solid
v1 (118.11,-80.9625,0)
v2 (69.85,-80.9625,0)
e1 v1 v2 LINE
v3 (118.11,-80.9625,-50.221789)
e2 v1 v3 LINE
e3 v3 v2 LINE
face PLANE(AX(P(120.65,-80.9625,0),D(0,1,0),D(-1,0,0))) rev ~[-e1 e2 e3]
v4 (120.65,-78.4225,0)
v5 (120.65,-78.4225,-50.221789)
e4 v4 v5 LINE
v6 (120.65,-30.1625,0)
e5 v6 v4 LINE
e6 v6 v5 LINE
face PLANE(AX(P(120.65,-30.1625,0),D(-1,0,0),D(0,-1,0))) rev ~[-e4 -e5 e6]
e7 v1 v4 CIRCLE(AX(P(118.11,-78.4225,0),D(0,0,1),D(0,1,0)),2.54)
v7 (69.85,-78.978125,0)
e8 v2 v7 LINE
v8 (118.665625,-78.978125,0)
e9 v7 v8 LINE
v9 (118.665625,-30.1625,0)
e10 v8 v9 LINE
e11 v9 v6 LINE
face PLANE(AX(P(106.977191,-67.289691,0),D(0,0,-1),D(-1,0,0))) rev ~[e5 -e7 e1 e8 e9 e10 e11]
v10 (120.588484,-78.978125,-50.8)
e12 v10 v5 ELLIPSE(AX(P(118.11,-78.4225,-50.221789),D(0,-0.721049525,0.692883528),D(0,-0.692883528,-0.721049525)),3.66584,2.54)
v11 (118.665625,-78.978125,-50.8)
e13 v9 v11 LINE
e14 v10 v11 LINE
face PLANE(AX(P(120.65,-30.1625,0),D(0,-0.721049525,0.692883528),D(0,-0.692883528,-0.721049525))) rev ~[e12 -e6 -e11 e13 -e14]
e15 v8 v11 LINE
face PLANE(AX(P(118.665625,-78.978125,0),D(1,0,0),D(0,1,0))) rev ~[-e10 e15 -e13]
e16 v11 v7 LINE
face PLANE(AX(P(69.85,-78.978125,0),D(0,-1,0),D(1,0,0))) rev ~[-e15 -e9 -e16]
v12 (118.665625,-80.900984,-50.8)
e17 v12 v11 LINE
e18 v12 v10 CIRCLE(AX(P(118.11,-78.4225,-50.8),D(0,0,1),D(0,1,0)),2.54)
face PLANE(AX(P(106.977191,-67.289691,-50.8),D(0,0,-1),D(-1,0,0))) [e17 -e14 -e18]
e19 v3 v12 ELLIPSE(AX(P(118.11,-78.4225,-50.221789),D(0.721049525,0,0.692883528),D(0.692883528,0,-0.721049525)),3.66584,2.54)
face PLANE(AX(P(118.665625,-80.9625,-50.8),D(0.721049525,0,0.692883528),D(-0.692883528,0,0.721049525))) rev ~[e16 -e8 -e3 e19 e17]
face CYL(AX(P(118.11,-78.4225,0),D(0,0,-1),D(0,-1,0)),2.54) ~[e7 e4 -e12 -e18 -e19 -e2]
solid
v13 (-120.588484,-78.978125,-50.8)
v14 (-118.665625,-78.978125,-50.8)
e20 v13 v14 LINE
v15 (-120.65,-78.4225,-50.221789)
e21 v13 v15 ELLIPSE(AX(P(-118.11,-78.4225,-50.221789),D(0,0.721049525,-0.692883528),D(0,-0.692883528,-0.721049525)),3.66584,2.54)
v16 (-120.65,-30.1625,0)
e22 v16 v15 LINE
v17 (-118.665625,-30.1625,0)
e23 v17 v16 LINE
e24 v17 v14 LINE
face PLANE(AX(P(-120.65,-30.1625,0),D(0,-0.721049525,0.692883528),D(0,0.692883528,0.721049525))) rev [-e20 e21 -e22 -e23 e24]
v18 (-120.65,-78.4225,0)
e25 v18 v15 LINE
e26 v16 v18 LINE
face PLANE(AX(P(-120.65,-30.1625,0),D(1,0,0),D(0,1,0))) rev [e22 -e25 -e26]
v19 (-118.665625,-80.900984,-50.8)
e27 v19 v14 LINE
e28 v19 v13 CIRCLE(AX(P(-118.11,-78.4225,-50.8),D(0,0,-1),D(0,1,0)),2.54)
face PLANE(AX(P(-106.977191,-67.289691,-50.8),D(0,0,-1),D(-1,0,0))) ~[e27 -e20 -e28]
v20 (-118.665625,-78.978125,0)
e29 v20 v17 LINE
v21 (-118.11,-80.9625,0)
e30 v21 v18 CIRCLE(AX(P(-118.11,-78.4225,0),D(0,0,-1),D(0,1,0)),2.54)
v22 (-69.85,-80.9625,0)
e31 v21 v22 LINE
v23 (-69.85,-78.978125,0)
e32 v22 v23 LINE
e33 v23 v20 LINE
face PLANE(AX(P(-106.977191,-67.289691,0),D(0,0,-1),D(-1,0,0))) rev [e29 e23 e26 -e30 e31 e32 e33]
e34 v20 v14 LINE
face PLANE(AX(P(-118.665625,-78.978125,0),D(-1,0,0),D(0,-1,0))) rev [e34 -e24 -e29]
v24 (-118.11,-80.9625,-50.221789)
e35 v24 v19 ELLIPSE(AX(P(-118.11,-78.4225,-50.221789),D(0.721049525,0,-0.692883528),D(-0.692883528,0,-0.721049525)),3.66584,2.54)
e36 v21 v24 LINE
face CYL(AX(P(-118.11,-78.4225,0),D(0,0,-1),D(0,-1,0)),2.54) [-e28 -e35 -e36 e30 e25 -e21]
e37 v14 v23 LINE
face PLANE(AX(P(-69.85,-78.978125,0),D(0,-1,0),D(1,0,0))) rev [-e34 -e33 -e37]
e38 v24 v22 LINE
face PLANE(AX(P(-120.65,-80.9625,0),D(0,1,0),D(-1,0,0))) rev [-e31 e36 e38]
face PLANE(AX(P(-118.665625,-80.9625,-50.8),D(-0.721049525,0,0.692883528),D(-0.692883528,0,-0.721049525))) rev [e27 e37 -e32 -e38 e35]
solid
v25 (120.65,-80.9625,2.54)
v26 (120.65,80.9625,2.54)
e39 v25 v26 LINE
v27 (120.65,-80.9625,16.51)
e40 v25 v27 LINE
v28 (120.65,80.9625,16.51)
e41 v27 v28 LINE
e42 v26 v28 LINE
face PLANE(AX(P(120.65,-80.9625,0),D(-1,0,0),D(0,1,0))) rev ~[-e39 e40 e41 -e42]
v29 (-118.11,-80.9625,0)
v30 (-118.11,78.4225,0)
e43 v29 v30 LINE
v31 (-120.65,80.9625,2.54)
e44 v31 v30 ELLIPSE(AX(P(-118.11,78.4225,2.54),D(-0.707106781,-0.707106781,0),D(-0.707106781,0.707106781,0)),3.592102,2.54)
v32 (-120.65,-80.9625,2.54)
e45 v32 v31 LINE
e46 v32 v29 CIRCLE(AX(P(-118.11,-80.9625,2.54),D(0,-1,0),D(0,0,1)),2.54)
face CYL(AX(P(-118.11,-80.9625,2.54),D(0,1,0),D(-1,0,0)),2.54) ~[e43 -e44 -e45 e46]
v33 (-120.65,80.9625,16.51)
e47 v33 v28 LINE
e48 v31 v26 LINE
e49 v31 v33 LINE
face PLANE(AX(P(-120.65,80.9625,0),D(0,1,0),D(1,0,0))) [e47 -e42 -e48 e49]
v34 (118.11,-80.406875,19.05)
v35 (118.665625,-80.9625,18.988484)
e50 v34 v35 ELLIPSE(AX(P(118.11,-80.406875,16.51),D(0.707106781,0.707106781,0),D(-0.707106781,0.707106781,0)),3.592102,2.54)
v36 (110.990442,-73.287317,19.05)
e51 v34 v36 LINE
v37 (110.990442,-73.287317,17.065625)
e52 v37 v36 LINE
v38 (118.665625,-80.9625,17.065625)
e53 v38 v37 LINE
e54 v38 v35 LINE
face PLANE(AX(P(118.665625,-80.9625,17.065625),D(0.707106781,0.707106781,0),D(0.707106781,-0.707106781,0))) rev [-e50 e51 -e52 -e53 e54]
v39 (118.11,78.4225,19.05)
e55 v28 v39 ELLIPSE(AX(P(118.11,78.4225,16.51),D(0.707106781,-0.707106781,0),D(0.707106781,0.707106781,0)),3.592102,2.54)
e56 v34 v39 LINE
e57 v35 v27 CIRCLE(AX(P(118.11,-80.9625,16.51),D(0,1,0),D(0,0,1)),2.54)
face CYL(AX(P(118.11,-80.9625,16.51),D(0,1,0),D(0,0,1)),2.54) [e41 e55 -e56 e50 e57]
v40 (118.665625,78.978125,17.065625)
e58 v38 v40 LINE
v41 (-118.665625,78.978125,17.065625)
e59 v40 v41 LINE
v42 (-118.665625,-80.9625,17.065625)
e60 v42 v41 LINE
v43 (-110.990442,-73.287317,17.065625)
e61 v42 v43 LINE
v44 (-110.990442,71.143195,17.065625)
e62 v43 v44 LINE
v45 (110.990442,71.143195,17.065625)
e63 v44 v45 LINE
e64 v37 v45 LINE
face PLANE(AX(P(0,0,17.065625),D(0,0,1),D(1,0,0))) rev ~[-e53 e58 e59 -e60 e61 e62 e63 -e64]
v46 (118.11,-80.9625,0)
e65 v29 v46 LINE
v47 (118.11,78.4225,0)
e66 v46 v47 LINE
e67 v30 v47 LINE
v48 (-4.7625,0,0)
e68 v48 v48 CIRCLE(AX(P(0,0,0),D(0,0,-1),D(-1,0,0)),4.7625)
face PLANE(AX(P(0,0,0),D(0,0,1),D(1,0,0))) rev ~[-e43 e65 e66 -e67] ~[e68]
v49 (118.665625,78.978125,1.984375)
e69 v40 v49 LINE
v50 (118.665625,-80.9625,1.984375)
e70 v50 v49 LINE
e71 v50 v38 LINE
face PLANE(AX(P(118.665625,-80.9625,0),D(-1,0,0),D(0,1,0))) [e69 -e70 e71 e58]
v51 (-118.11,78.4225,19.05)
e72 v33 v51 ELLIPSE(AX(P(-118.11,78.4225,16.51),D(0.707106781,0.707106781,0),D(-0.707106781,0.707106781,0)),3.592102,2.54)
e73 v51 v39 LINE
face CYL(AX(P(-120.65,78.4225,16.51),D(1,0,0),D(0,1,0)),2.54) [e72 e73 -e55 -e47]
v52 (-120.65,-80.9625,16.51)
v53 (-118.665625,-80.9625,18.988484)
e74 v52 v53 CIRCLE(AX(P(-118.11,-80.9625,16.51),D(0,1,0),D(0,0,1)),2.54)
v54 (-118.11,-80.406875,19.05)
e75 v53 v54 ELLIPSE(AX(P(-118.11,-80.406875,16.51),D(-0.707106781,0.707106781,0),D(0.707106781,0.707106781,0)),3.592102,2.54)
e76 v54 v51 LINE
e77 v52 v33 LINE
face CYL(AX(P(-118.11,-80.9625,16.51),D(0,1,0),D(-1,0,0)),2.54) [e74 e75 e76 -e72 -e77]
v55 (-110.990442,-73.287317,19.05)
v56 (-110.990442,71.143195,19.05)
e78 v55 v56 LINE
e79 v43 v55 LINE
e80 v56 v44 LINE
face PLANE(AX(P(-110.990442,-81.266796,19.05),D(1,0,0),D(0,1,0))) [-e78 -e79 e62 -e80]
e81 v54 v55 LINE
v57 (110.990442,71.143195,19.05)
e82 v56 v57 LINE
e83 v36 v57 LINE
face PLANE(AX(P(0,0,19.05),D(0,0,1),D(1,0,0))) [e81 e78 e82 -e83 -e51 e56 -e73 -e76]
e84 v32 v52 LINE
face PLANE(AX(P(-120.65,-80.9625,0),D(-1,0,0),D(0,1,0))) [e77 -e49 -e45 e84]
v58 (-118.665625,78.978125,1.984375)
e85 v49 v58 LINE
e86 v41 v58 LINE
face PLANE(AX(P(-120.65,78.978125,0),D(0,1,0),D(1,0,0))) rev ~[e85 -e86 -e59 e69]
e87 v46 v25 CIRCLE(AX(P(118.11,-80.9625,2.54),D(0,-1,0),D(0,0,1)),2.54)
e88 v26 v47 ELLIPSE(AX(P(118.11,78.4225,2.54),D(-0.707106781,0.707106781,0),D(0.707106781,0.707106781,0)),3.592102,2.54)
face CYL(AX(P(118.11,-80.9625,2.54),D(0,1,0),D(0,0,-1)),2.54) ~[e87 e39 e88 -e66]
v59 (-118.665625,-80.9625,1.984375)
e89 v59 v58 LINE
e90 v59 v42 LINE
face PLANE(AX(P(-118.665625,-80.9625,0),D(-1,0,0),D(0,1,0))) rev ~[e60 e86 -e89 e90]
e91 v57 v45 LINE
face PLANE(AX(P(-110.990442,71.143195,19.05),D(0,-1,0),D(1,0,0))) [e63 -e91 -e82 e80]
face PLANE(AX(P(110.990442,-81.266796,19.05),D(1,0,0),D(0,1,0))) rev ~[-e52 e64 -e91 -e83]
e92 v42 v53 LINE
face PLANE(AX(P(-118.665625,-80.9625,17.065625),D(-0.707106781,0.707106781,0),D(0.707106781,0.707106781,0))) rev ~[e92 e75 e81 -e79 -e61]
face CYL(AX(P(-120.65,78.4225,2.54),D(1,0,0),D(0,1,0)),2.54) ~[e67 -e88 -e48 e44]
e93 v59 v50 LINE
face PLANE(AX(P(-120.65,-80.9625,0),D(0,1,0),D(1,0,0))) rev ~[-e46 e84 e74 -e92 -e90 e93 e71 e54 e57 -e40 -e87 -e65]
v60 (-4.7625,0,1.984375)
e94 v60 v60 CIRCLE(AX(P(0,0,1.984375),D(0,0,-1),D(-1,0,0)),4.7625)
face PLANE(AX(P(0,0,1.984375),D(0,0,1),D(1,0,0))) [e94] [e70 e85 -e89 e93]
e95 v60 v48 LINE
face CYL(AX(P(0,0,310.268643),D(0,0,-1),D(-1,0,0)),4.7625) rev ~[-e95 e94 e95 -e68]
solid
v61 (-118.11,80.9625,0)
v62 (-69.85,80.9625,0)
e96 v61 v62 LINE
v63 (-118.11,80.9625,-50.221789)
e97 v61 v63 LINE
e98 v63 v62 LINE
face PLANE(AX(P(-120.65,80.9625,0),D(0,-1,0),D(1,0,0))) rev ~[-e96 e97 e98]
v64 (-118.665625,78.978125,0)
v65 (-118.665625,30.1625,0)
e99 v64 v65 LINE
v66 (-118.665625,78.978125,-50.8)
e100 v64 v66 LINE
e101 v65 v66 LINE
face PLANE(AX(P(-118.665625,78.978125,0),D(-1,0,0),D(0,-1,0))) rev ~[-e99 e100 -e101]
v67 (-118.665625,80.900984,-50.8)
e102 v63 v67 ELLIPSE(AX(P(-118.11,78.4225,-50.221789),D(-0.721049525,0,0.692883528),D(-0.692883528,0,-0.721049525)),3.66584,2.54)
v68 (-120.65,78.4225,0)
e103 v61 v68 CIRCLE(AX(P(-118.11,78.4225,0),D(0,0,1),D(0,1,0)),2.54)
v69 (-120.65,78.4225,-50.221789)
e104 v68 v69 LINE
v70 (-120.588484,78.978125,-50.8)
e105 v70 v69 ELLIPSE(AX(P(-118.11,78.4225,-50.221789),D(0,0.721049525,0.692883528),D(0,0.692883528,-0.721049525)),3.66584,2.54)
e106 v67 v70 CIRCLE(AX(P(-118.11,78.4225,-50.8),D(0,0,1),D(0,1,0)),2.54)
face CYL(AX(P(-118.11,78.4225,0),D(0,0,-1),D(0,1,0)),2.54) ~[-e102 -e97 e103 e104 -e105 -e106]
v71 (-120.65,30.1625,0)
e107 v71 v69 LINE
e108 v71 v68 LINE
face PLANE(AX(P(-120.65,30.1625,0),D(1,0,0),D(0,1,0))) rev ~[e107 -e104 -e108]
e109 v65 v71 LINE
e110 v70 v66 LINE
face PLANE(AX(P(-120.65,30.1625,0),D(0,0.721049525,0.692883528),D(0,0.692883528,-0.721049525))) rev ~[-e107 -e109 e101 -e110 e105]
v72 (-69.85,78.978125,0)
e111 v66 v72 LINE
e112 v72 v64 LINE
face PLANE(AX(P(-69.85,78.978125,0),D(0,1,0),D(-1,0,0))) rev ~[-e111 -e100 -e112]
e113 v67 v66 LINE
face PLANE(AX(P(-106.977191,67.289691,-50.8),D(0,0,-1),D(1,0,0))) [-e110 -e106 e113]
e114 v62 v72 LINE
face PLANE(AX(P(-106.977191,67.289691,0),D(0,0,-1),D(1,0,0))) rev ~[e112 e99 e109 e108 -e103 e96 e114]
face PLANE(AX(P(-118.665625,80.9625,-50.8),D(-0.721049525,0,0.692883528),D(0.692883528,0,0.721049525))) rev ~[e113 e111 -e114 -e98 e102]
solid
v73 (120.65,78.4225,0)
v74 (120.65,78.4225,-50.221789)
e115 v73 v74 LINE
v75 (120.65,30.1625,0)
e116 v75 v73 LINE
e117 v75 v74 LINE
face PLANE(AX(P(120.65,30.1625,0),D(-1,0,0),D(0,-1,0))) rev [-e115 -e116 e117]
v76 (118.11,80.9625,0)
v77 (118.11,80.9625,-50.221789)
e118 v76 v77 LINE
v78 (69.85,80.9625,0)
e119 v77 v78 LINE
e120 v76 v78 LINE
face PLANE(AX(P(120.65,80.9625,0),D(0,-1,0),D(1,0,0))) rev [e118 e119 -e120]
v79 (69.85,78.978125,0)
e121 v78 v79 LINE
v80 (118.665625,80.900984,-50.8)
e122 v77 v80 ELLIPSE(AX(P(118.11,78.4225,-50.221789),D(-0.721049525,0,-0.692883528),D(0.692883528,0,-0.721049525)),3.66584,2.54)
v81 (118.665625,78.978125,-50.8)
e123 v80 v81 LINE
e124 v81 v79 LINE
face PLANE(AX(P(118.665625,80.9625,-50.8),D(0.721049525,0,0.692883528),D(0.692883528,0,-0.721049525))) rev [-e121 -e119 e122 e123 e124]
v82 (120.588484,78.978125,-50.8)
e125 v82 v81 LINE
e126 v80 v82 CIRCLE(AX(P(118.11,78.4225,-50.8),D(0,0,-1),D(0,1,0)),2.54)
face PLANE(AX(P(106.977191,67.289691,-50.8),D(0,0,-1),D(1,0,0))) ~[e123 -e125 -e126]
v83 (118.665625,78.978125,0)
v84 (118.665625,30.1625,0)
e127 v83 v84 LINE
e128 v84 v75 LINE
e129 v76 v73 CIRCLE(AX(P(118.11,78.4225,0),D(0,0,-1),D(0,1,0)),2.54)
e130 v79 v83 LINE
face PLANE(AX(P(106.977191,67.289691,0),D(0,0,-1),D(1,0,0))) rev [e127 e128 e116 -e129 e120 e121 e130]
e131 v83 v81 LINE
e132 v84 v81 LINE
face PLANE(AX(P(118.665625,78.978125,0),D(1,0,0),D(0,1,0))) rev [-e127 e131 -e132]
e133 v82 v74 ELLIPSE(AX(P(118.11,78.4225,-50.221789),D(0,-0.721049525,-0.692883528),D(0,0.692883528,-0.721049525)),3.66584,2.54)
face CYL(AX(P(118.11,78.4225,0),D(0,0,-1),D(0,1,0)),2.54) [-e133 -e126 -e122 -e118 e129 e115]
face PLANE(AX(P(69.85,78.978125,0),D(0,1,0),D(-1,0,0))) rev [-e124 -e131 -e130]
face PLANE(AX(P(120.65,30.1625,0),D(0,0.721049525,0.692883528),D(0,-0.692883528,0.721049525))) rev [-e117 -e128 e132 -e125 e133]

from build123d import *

# Parameters (mm, degrees)
F0_W      = 241.3
F0_H      = 161.925
F1_DEPTH  = 19.05
F3_T      = -1.984375
F4_W      = 221.9808846712
F4_H      = 152.4099913843
F5_DEPTH  = 5.17584
F7_DEPTH  = 50.8
F9_DEPTH  = 1.984375
F11_DEPTH = 1.984375
F14_R     = 2.54
F15_R     = 2.54
F15_2_R   = 2.54
F15_3_R   = 2.54
F15_4_R   = 2.54
F17_DEPTH = 1.984375
F19_D     = 9.525


# Not quite as in the source:
# - a length typed as a fraction of an inch, garbled in the dataset ("3 / 203.2 mm" for 3/8 in), is restored
# - a pattern or mirror of a feature is missing from the dataset's text; its kind, count and spacing are read off the source's solid


with BuildPart() as f1:
    # F0 (on Top) → F1 (new body)
    with BuildSketch(Plane.XY):
        Rectangle(F0_W, F0_H)
    extrude(amount=F1_DEPTH)

    # F3
    f3_openings = [f1.faces().sort_by_distance(p)[0] for p in [
        (0, -80.9625, 9.525),
    ]]
    offset(amount=F3_T, openings=f3_openings)

    # F4 (on face) → F5 (cut)
    with BuildSketch(Plane.XY.offset(19.05)):
        with Locations((0, -5.0618006591)):
            Rectangle(F4_W, F4_H)
    extrude(amount=-F5_DEPTH, mode=Mode.SUBTRACT)

    # F14
    f14_edges = [f1.edges().sort_by_distance(p)[0] for p in [
        (-120.65, 0, 19.05),
        (0, 80.9625, 19.05),
        (120.65, 0, 19.05),
        (-120.65, 0, 0),
        (0, 80.9625, 0),
        (120.65, 0, 0),
    ]]
    fillet(f14_edges, radius=F14_R)

    # F16 (on face) → F17 (cut, through all)
    with BuildSketch(Plane(origin=(0, 0, 17.065625), x_dir=(1, 0, 0), z_dir=(0, 0, -1))):
        Polygon((-110.9904423356, 73.2873173356), (-110.9904423356, 80.9625), (-118.665625, 80.9625), align=None)
    f17 = extrude(amount=-F17_DEPTH, mode=Mode.SUBTRACT)

    # F17_copies: F17 across plane
    add(f17.mirror(Plane(origin=(0, 0, 0), x_dir=(0, 0, 1), z_dir=(1, 0, 0))), mode=Mode.SUBTRACT)

    # F19 (through all)
    with Locations(Plane.XY.offset(19.05)):
        with Locations((0, 0)):
            Hole(F19_D / 2)


with BuildPart() as f7:
    # F6 (on face) → F7 (new body)
    with BuildSketch(Plane(origin=(0, 0, 0), x_dir=(1, 0, 0), z_dir=(0, 0, -1))):
        Polygon((-120.65, -80.9625), (-69.85, -80.9625), (-69.85, -78.978125), (-118.665625, -78.978125), (-118.665625, -30.1625), (-120.65, -30.1625), align=None)
    extrude(amount=F7_DEPTH)

    # F8 (on face) → F9 (cut, through all)
    with BuildSketch(Plane(origin=(-120.65, 0, 0), x_dir=(0, -1, 0), z_dir=(-1, 0, 0))):
        Polygon((-30.1625, 0), (-78.978125, -50.8), (-30.1625, -50.8), align=None)
    extrude(amount=-F9_DEPTH, mode=Mode.SUBTRACT)

    # F10 (on face) → F11 (cut, through all)
    with BuildSketch(Plane(origin=(0, 80.9625, 0), x_dir=(-1, 0, 0), z_dir=(0, 1, 0))):
        Polygon((118.665625, -50.8), (69.85, 0), (69.85, -50.8), align=None)
    extrude(amount=-F11_DEPTH, mode=Mode.SUBTRACT)


with BuildPart() as f12_1:
    # F12: instance of F7
    add(f7.part.mirror(Plane.YZ))


with BuildPart() as f13_1:
    # F13: instance of F12_1
    add(f12_1.part.mirror(Plane.XZ))

    # F15#3
    f15_3_edges = [f13_1.edges().sort_by_distance(p)[0] for p in [
        (120.65, -80.9625, -25.4),
    ]]
    fillet(f15_3_edges, radius=F15_3_R)


with BuildPart() as f13_2:
    # F13: instance of F7
    add(f7.part.mirror(Plane.XZ))

    # F15#4
    f15_4_edges = [f13_2.edges().sort_by_distance(p)[0] for p in [
        (-120.65, -80.9625, -25.4),
    ]]
    fillet(f15_4_edges, radius=F15_4_R)


with BuildPart() as f7_1:
    add(f7.part)

    # F15
    f15_edges = [f7_1.edges().sort_by_distance(p)[0] for p in [
        (-120.65, 80.9625, -25.4),
    ]]
    fillet(f15_edges, radius=F15_R)


with BuildPart() as f12_1_1:
    add(f12_1.part)

    # F15#2
    f15_2_edges = [f12_1_1.edges().sort_by_distance(p)[0] for p in [
        (120.65, 80.9625, -25.4),
    ]]
    fillet(f15_2_edges, radius=F15_2_R)


solid = Compound([f1.part, f13_1.part, f13_2.part, f7_1.part, f12_1_1.part])
